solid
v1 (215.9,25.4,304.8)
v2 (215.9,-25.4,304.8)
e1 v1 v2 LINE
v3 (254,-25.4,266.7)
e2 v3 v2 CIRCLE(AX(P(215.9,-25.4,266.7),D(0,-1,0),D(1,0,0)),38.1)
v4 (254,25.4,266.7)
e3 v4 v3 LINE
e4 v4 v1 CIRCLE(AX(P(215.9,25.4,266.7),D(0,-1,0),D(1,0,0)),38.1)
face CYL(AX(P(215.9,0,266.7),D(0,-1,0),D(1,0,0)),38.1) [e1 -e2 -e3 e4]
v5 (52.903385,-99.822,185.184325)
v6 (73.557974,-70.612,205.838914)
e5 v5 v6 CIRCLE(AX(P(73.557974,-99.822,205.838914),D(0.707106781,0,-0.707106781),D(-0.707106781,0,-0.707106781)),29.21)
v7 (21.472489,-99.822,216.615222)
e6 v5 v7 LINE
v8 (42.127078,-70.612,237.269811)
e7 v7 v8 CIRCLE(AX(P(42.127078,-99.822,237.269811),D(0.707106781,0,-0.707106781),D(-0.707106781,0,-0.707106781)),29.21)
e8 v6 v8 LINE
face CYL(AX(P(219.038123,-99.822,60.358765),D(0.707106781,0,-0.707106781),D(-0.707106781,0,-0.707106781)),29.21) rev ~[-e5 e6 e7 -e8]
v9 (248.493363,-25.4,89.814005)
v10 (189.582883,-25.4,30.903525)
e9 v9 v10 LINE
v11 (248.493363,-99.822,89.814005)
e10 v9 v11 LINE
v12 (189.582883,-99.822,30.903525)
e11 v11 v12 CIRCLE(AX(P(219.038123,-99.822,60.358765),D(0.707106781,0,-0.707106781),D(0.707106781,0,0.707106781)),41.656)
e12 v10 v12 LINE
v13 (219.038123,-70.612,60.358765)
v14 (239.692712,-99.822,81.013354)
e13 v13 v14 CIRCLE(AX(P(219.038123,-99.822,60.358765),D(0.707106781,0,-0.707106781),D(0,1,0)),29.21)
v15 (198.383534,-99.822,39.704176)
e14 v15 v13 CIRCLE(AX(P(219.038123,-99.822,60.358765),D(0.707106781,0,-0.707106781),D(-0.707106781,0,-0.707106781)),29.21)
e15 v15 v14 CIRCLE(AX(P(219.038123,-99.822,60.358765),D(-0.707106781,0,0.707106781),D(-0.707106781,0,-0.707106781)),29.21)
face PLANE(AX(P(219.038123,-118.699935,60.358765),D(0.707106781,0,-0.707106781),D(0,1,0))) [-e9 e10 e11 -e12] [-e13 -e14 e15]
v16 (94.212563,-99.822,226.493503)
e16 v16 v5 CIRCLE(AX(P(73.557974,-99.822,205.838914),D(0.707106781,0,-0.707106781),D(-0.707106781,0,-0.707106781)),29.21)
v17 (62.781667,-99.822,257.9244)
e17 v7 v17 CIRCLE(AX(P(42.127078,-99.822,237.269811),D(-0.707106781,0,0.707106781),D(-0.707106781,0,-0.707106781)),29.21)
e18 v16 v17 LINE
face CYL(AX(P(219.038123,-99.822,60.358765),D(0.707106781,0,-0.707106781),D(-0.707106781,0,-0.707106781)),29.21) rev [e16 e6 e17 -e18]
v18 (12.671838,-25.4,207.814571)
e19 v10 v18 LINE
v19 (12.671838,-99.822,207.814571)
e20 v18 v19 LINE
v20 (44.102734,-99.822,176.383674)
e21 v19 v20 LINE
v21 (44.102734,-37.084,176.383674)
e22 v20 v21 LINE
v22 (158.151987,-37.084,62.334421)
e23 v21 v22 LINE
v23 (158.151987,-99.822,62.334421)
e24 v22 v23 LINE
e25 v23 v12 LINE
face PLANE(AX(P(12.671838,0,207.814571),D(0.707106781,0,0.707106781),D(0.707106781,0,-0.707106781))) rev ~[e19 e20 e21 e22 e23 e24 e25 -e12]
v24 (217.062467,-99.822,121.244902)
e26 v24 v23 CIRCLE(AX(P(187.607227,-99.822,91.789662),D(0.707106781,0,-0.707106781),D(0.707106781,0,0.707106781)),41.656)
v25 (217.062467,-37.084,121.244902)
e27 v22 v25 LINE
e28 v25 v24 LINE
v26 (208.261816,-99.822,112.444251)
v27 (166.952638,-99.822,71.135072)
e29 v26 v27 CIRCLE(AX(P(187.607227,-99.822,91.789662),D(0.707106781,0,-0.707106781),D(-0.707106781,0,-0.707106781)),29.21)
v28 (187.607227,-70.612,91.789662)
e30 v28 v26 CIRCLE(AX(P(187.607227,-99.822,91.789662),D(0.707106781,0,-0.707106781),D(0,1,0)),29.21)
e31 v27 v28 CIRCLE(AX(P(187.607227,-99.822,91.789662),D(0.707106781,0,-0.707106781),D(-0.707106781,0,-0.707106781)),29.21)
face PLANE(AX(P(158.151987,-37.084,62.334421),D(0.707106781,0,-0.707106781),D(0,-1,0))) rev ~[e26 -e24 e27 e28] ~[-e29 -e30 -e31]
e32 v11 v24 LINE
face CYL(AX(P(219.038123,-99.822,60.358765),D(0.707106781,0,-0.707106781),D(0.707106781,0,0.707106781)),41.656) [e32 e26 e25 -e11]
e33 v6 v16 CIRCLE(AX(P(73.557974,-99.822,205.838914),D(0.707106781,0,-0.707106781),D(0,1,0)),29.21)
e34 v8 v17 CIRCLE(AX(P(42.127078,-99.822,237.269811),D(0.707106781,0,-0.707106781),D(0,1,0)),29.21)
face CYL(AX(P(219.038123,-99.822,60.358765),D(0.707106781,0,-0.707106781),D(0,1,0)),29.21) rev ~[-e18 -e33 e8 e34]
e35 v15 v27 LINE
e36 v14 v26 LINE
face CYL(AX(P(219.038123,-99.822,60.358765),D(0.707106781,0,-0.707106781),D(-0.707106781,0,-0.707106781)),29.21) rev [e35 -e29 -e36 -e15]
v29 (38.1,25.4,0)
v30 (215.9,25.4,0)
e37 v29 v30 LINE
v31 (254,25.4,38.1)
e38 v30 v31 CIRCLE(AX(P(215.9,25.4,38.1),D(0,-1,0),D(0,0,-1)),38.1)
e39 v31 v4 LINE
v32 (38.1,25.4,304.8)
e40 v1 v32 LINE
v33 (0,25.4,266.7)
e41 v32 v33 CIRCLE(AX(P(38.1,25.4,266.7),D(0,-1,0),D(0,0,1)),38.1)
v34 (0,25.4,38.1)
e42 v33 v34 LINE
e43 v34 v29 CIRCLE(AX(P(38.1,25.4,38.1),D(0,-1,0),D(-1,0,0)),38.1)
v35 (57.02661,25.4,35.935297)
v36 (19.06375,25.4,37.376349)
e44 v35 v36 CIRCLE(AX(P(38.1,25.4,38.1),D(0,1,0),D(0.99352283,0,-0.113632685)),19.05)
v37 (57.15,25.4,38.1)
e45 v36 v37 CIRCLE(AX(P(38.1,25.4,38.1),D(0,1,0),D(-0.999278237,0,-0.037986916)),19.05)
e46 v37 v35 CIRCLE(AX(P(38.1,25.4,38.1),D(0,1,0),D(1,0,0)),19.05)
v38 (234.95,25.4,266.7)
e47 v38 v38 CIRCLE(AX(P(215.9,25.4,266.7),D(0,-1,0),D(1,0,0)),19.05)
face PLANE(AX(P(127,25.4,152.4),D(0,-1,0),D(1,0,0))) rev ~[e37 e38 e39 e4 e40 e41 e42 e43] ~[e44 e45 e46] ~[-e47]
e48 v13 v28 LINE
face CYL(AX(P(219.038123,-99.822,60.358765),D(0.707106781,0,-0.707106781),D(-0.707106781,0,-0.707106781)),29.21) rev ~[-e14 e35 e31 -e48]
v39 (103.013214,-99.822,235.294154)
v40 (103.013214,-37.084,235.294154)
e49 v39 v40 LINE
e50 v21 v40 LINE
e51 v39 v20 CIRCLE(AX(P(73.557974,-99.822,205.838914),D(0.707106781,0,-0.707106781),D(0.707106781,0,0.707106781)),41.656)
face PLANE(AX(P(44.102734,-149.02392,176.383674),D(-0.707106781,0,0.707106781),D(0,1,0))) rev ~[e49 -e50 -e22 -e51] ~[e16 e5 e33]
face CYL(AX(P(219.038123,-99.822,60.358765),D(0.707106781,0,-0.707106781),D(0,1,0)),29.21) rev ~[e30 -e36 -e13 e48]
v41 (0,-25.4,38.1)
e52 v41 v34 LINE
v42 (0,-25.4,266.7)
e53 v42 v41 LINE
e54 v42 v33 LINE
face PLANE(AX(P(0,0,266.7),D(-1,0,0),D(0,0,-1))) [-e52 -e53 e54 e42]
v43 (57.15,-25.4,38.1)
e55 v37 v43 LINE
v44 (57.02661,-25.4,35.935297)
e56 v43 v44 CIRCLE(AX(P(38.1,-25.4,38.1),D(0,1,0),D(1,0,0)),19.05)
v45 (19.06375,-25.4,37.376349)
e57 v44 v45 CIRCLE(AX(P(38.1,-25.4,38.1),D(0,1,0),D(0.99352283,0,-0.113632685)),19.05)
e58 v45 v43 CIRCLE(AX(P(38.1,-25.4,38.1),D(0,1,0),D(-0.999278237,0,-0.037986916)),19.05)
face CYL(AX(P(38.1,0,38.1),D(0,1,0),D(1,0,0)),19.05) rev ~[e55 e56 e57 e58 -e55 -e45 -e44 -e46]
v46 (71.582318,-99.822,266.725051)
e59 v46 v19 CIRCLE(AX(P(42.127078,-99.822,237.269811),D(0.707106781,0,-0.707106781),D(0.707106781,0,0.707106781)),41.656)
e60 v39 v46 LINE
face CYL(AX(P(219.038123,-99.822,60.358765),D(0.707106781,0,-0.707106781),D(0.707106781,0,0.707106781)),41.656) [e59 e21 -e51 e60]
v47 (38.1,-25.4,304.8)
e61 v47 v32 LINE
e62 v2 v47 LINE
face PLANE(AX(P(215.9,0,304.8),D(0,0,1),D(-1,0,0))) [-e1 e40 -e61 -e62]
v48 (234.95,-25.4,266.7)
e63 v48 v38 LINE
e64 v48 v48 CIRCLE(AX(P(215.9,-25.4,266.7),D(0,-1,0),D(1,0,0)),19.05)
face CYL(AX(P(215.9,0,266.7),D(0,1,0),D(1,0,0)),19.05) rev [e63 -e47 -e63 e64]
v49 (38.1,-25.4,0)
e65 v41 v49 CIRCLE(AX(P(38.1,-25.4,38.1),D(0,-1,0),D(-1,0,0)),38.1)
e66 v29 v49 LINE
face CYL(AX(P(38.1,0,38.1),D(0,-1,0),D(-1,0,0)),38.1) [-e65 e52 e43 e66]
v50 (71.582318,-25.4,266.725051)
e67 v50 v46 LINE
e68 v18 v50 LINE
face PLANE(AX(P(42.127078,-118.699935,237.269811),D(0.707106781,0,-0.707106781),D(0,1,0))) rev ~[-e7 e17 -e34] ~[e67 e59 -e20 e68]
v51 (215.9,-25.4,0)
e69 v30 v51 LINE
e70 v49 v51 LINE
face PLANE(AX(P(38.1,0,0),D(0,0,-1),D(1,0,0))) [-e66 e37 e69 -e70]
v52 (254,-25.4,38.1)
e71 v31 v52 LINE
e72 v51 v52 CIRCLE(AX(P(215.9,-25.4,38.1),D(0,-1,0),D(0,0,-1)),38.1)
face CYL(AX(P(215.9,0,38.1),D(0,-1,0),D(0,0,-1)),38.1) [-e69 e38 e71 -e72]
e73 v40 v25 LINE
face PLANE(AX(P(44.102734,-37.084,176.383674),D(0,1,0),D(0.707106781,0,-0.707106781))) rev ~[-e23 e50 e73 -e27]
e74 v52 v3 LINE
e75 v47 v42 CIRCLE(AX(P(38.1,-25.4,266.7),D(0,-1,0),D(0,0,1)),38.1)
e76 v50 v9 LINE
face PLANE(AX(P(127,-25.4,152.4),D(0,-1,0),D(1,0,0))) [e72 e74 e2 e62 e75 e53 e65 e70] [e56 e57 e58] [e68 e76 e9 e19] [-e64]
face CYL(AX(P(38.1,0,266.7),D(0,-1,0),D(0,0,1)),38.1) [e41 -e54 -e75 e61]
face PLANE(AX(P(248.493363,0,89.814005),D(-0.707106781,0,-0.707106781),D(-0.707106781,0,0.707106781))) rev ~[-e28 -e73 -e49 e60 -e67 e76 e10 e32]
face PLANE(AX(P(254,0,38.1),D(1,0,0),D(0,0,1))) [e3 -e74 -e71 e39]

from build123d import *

# Parameters (mm, degrees)
F0_R     = 19.05
F1_DEPTH = 25.4
F2_DEPTH = 99.822
F4_DEPTH = 250.19
F5_DEPTH = 250.19
F6_W     = 161.29
F6_H     = 62.738
F6_H_2   = 49.2019202976
F7_DEPTH = 171.704


# Not quite as in the source:
# - a feature names something its author has since deleted; it is built from what else it names


with BuildPart() as f1:
    # F0 (on Front) → F1 (new body, symmetric)
    with BuildSketch(Plane.XZ):
        with BuildLine():
            ThreePointArc((0, 38.1), (11.1592316368, 11.1592316368), (38.1, 0))
            Line((38.1, 0), (215.9, 0))
            ThreePointArc((215.9, 0), (242.8407683632, 11.1592316368), (254, 38.1))
            Line((254, 38.1), (254, 266.7))
            ThreePointArc((254, 266.7), (242.8407683632, 293.6407683632), (215.9, 304.8))
            Line((215.9, 304.8), (38.1, 304.8))
            ThreePointArc((38.1, 304.8), (11.1592316368, 293.6407683632), (0, 266.7))
            Line((0, 266.7), (0, 38.1))
        make_face()
        with BuildLine():
            ThreePointArc((57.0266099035, 35.9352973504), (37.3773915988, 19.0637099965), (19.0637495923, 37.376349246))
            ThreePointArc((19.0637495923, 37.376349246), (37.7381093173, 57.1465622918), (57.15, 38.1))
            ThreePointArc((57.15, 38.1), (57.1191274598, 37.0158917631), (57.0266099035, 35.9352973504))
        make_face(mode=Mode.SUBTRACT)
        Polygon((248.4933634432, 89.814005202), (189.582883289, 30.9035250478), (12.671837704, 207.8145706329), (71.5823178582, 266.7250507871), align=None, mode=Mode.SUBTRACT)
        with Locations((215.9, 266.7)):
            Circle(F0_R, mode=Mode.SUBTRACT)
        Polygon((12.671837704, 207.8145706329), (189.582883289, 30.9035250478), (248.4933634432, 89.814005202), (71.5823178582, 266.7250507871), align=None)
    extrude(amount=F1_DEPTH, both=True)

    # F0 (on Front) → F2 (join)
    with BuildSketch(Plane.XZ):
        Polygon((12.671837704, 207.8145706329), (189.582883289, 30.9035250478), (248.4933634432, 89.814005202), (71.5823178582, 266.7250507871), align=None)
    extrude(amount=F2_DEPTH)

    # F3 (on face) → F4 (join)
    with BuildSketch(Plane(origin=(79.3396791206, 0, -79.3396791206), x_dir=(0, 1, 0), z_dir=(0.7071067812, 0, -0.7071067812))):
        with BuildLine():
            ThreePointArc((-99.822, 168.3534344944), (-129.032, 197.5634344944), (-99.822, 226.7734344944))
            Line((-99.822, 226.7734344944), (-99.822, 239.2194344944))
            ThreePointArc((-99.822, 239.2194344944), (-141.478, 197.5634344944), (-99.822, 155.9074344944))
            Line((-99.822, 155.9074344944), (-99.822, 168.3534344944))
        make_face()
    extrude(amount=-F4_DEPTH)

    # F3 (on face) → F5 (cut)
    with BuildSketch(Plane(origin=(79.3396791206, 0, -79.3396791206), x_dir=(0, 1, 0), z_dir=(0.7071067812, 0, -0.7071067812))):
        with BuildLine():
            ThreePointArc((-99.822, 168.3534344944), (-79.1674109215, 176.908845416), (-70.612, 197.5634344944))
            ThreePointArc((-70.612, 197.5634344944), (-79.1674109215, 218.2180235729), (-99.822, 226.7734344944))
            Line((-99.822, 226.7734344944), (-99.822, 168.3534344944))
        make_face()
    extrude(amount=-F5_DEPTH, mode=Mode.SUBTRACT)

    # F6 (on face) → F7 (cut)
    with BuildSketch(Plane(origin=(110.2432041684, 0, 110.2432041684), x_dir=(0.7071067812, 0, -0.7071067812), z_dir=(-0.7071067812, 0, -0.7071067812))):
        with Locations((-12.8917497533, 68.453)):
            Rectangle(F6_W, F6_H)
        with Locations((-12.8917497533, 124.4229601488)):
            Rectangle(F6_W, F6_H_2)
    extrude(amount=-F7_DEPTH, mode=Mode.SUBTRACT)


solid = f1.part
